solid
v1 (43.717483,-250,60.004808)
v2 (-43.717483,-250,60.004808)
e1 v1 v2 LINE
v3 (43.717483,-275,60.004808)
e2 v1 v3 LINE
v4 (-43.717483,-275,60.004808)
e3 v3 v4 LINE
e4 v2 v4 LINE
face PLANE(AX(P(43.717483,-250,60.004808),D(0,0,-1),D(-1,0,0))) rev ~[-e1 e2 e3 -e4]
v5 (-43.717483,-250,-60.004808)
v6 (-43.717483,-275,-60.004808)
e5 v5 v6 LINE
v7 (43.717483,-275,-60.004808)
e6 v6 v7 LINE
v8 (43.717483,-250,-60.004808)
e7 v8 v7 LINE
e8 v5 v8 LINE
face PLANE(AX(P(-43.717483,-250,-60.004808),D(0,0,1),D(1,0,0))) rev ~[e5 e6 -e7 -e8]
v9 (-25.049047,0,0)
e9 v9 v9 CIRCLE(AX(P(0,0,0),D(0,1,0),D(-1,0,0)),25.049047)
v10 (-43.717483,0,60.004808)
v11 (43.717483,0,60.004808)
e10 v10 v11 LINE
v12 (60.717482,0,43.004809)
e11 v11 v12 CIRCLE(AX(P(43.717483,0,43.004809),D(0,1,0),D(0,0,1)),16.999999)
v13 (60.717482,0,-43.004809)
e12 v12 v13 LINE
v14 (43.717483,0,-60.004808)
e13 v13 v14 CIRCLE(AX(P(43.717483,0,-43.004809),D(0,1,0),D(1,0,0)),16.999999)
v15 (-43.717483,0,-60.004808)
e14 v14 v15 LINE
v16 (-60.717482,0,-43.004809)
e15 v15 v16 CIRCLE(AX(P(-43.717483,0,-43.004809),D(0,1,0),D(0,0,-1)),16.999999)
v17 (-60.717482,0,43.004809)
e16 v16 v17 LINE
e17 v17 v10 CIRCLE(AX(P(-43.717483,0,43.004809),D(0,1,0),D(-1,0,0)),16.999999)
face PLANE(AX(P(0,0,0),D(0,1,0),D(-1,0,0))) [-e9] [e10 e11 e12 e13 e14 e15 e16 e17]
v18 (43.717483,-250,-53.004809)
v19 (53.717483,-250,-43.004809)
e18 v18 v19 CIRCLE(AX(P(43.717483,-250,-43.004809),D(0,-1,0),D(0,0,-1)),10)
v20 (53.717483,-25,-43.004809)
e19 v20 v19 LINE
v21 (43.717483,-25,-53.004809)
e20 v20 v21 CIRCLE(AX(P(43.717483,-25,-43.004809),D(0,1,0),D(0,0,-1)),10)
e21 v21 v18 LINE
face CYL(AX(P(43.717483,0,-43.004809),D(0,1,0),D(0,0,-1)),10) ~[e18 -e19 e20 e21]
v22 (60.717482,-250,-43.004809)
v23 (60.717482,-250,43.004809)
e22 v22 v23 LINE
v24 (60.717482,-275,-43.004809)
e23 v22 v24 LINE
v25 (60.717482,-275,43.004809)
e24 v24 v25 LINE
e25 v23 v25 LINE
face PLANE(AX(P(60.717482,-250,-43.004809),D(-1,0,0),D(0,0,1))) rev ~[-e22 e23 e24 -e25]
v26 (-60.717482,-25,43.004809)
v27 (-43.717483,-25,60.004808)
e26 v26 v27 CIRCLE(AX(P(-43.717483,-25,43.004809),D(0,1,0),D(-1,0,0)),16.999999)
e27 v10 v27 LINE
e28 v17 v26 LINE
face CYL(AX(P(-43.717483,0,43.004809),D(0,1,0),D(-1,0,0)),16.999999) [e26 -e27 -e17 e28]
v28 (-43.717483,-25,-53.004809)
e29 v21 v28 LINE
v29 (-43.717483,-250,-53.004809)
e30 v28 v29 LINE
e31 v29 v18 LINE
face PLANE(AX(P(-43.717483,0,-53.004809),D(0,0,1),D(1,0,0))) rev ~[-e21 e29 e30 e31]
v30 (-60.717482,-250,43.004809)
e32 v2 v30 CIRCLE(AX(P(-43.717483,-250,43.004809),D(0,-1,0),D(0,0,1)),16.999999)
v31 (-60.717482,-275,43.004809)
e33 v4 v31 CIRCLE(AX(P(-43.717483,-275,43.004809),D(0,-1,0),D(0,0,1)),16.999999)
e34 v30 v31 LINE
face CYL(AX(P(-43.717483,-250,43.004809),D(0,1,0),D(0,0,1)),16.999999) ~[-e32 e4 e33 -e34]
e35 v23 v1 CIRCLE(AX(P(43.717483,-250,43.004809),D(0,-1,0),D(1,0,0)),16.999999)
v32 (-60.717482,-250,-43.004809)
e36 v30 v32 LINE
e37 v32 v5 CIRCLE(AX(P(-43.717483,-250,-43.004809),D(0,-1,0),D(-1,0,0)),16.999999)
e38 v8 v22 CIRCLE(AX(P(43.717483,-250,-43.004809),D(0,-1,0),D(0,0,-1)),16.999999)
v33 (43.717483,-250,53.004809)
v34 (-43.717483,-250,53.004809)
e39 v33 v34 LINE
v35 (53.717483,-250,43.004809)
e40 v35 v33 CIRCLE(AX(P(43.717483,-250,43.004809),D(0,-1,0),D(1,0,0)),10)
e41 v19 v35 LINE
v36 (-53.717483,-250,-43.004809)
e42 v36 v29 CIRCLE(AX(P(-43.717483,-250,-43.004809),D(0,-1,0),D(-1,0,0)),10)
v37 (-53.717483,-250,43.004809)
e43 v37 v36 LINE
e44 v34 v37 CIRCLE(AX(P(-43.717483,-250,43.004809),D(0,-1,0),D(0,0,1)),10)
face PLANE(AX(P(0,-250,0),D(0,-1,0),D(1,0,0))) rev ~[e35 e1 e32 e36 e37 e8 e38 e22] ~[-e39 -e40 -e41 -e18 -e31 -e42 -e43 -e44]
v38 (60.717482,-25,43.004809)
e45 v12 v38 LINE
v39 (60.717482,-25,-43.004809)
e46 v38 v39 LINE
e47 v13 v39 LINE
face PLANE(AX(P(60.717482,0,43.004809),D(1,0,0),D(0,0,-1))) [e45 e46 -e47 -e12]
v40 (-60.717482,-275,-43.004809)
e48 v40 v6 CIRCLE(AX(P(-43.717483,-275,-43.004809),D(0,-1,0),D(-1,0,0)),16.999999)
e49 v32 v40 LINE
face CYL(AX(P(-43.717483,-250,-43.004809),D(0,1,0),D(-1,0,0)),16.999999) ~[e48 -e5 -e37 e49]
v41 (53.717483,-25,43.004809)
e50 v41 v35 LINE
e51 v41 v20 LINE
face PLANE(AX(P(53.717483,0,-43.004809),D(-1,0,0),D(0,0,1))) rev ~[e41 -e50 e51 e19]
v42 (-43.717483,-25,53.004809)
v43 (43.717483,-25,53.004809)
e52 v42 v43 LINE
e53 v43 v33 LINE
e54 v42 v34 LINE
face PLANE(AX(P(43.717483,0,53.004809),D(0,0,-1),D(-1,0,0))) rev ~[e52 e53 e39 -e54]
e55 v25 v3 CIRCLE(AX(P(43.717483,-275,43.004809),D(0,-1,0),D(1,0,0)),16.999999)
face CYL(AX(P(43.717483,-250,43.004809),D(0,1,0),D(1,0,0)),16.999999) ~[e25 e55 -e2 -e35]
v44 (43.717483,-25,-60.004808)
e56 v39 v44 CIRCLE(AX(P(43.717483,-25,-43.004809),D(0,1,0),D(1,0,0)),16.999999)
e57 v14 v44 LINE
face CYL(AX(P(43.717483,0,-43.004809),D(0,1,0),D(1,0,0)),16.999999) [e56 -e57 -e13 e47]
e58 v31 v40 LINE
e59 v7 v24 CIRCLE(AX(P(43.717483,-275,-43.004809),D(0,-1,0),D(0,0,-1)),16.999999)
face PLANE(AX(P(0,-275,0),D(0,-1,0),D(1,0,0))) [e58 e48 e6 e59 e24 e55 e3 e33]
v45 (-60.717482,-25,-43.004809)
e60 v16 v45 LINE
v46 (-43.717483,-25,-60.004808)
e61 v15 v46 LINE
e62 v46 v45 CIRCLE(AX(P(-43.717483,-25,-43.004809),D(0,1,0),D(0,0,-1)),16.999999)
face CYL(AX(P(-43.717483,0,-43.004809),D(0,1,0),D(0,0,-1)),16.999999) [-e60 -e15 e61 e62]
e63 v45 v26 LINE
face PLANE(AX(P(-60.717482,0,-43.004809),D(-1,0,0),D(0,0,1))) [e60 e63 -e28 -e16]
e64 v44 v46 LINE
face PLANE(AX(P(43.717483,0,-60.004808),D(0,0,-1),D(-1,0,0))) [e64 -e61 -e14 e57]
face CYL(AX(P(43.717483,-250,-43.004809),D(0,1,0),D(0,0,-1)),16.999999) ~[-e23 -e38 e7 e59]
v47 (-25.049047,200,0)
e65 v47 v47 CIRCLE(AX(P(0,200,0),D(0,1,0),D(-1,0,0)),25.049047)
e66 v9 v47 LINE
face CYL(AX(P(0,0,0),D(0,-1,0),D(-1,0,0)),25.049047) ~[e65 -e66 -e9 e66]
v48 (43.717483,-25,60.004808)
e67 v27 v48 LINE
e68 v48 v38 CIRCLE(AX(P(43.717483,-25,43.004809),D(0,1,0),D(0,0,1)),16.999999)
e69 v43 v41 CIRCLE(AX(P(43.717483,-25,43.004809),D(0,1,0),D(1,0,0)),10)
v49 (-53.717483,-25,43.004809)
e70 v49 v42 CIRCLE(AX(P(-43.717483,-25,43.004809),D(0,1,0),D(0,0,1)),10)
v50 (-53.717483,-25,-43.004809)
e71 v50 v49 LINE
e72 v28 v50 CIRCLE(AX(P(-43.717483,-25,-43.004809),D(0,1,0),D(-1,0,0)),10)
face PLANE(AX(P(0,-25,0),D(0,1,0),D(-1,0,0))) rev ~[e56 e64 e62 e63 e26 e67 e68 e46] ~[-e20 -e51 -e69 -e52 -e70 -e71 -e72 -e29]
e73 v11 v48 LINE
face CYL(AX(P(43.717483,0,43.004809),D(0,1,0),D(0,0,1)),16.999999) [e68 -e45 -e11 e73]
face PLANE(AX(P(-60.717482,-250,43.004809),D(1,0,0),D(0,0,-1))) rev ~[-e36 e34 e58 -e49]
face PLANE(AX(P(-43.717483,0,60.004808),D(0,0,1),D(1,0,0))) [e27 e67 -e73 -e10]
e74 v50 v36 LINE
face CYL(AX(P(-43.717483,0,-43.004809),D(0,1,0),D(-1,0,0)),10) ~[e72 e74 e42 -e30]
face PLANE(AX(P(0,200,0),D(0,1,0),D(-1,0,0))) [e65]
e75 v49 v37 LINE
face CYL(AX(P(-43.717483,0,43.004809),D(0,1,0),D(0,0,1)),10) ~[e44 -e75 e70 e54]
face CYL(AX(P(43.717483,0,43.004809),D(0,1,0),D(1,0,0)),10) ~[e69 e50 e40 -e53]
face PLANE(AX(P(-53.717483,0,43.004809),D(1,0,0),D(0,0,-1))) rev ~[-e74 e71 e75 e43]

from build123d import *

# Parameters (mm, degrees)
F1_DEPTH = 250
F4_DEPTH = 25
F5_R     = 25.0490469986
F6_DEPTH = 200


with BuildPart() as f1:
    # F0 (on Front) → F1 (new body)
    with BuildSketch(Plane.XZ):
        with BuildLine():
            ThreePointArc((53.7174828351, 43.0048087239), (50.7885506469, 50.0758765358), (43.7174828351, 53.0048087239))
            Line((43.7174828351, 53.0048087239), (-43.7174828351, 53.0048087239))
            ThreePointArc((-43.7174828351, 53.0048087239), (-50.7885506469, 50.0758765358), (-53.7174828351, 43.0048087239))
            Line((-53.7174828351, 43.0048087239), (-53.7174828351, -43.0048087239))
            ThreePointArc((-53.7174828351, -43.0048087239), (-50.7885506469, -50.0758765358), (-43.7174828351, -53.0048087239))
            Line((-43.7174828351, -53.0048087239), (43.7174828351, -53.0048087239))
            ThreePointArc((43.7174828351, -53.0048087239), (50.7885506469, -50.0758765358), (53.7174828351, -43.0048087239))
            Line((53.7174828351, -43.0048087239), (53.7174828351, 43.0048087239))
        make_face()
    extrude(amount=F1_DEPTH)

    # F2 (on face) + F3 (on face) → F4 (join)
    with BuildSketch(Plane.XZ.offset(250)):
        with BuildLine():
            Line((-60.7174821198, 43.0048087239), (-60.7174821198, -43.0048087239))
            ThreePointArc((-60.7174821198, -43.0048087239), (-55.7382976095, -55.0256234983), (-43.7174828351, -60.0048080087))
            Line((-43.7174828351, -60.0048080087), (43.7174828351, -60.0048080087))
            ThreePointArc((43.7174828351, -60.0048080087), (55.7382976095, -55.0256234983), (60.7174821198, -43.0048087239))
            Line((60.7174821198, -43.0048087239), (60.7174821198, 43.0048087239))
            ThreePointArc((60.7174821198, 43.0048087239), (55.7382976095, 55.0256234983), (43.7174828351, 60.0048080087))
            Line((43.7174828351, 60.0048080087), (-43.7174828351, 60.0048080087))
            ThreePointArc((-43.7174828351, 60.0048080087), (-55.7382976095, 55.0256234983), (-60.7174821198, 43.0048087239))
        make_face()
    with BuildSketch(Plane(origin=(0, 0, 0), x_dir=(-1, 0, 0), z_dir=(0, 1, 0))):
        with BuildLine():
            Line((-60.7174821198, 43.0048087239), (-60.7174821198, -43.0048087239))
            ThreePointArc((-60.7174821198, -43.0048087239), (-55.7382976095, -55.0256234983), (-43.7174828351, -60.0048080087))
            Line((-43.7174828351, -60.0048080087), (43.7174828351, -60.0048080087))
            ThreePointArc((43.7174828351, -60.0048080087), (55.7382976095, -55.0256234983), (60.7174821198, -43.0048087239))
            Line((60.7174821198, -43.0048087239), (60.7174821198, 43.0048087239))
            ThreePointArc((60.7174821198, 43.0048087239), (55.7382976095, 55.0256234983), (43.7174828351, 60.0048080087))
            Line((43.7174828351, 60.0048080087), (-43.7174828351, 60.0048080087))
            ThreePointArc((-43.7174828351, 60.0048080087), (-55.7382976095, 55.0256234983), (-60.7174821198, 43.0048087239))
        make_face()
    extrude(amount=F4_DEPTH, dir=(0, -1, 0))

    # F5 (on face) → F6 (join)
    with BuildSketch(Plane(origin=(0, 0, 0), x_dir=(-1, 0, 0), z_dir=(0, 1, 0))):
        Circle(F5_R)
    extrude(amount=F6_DEPTH)


solid = f1.part
